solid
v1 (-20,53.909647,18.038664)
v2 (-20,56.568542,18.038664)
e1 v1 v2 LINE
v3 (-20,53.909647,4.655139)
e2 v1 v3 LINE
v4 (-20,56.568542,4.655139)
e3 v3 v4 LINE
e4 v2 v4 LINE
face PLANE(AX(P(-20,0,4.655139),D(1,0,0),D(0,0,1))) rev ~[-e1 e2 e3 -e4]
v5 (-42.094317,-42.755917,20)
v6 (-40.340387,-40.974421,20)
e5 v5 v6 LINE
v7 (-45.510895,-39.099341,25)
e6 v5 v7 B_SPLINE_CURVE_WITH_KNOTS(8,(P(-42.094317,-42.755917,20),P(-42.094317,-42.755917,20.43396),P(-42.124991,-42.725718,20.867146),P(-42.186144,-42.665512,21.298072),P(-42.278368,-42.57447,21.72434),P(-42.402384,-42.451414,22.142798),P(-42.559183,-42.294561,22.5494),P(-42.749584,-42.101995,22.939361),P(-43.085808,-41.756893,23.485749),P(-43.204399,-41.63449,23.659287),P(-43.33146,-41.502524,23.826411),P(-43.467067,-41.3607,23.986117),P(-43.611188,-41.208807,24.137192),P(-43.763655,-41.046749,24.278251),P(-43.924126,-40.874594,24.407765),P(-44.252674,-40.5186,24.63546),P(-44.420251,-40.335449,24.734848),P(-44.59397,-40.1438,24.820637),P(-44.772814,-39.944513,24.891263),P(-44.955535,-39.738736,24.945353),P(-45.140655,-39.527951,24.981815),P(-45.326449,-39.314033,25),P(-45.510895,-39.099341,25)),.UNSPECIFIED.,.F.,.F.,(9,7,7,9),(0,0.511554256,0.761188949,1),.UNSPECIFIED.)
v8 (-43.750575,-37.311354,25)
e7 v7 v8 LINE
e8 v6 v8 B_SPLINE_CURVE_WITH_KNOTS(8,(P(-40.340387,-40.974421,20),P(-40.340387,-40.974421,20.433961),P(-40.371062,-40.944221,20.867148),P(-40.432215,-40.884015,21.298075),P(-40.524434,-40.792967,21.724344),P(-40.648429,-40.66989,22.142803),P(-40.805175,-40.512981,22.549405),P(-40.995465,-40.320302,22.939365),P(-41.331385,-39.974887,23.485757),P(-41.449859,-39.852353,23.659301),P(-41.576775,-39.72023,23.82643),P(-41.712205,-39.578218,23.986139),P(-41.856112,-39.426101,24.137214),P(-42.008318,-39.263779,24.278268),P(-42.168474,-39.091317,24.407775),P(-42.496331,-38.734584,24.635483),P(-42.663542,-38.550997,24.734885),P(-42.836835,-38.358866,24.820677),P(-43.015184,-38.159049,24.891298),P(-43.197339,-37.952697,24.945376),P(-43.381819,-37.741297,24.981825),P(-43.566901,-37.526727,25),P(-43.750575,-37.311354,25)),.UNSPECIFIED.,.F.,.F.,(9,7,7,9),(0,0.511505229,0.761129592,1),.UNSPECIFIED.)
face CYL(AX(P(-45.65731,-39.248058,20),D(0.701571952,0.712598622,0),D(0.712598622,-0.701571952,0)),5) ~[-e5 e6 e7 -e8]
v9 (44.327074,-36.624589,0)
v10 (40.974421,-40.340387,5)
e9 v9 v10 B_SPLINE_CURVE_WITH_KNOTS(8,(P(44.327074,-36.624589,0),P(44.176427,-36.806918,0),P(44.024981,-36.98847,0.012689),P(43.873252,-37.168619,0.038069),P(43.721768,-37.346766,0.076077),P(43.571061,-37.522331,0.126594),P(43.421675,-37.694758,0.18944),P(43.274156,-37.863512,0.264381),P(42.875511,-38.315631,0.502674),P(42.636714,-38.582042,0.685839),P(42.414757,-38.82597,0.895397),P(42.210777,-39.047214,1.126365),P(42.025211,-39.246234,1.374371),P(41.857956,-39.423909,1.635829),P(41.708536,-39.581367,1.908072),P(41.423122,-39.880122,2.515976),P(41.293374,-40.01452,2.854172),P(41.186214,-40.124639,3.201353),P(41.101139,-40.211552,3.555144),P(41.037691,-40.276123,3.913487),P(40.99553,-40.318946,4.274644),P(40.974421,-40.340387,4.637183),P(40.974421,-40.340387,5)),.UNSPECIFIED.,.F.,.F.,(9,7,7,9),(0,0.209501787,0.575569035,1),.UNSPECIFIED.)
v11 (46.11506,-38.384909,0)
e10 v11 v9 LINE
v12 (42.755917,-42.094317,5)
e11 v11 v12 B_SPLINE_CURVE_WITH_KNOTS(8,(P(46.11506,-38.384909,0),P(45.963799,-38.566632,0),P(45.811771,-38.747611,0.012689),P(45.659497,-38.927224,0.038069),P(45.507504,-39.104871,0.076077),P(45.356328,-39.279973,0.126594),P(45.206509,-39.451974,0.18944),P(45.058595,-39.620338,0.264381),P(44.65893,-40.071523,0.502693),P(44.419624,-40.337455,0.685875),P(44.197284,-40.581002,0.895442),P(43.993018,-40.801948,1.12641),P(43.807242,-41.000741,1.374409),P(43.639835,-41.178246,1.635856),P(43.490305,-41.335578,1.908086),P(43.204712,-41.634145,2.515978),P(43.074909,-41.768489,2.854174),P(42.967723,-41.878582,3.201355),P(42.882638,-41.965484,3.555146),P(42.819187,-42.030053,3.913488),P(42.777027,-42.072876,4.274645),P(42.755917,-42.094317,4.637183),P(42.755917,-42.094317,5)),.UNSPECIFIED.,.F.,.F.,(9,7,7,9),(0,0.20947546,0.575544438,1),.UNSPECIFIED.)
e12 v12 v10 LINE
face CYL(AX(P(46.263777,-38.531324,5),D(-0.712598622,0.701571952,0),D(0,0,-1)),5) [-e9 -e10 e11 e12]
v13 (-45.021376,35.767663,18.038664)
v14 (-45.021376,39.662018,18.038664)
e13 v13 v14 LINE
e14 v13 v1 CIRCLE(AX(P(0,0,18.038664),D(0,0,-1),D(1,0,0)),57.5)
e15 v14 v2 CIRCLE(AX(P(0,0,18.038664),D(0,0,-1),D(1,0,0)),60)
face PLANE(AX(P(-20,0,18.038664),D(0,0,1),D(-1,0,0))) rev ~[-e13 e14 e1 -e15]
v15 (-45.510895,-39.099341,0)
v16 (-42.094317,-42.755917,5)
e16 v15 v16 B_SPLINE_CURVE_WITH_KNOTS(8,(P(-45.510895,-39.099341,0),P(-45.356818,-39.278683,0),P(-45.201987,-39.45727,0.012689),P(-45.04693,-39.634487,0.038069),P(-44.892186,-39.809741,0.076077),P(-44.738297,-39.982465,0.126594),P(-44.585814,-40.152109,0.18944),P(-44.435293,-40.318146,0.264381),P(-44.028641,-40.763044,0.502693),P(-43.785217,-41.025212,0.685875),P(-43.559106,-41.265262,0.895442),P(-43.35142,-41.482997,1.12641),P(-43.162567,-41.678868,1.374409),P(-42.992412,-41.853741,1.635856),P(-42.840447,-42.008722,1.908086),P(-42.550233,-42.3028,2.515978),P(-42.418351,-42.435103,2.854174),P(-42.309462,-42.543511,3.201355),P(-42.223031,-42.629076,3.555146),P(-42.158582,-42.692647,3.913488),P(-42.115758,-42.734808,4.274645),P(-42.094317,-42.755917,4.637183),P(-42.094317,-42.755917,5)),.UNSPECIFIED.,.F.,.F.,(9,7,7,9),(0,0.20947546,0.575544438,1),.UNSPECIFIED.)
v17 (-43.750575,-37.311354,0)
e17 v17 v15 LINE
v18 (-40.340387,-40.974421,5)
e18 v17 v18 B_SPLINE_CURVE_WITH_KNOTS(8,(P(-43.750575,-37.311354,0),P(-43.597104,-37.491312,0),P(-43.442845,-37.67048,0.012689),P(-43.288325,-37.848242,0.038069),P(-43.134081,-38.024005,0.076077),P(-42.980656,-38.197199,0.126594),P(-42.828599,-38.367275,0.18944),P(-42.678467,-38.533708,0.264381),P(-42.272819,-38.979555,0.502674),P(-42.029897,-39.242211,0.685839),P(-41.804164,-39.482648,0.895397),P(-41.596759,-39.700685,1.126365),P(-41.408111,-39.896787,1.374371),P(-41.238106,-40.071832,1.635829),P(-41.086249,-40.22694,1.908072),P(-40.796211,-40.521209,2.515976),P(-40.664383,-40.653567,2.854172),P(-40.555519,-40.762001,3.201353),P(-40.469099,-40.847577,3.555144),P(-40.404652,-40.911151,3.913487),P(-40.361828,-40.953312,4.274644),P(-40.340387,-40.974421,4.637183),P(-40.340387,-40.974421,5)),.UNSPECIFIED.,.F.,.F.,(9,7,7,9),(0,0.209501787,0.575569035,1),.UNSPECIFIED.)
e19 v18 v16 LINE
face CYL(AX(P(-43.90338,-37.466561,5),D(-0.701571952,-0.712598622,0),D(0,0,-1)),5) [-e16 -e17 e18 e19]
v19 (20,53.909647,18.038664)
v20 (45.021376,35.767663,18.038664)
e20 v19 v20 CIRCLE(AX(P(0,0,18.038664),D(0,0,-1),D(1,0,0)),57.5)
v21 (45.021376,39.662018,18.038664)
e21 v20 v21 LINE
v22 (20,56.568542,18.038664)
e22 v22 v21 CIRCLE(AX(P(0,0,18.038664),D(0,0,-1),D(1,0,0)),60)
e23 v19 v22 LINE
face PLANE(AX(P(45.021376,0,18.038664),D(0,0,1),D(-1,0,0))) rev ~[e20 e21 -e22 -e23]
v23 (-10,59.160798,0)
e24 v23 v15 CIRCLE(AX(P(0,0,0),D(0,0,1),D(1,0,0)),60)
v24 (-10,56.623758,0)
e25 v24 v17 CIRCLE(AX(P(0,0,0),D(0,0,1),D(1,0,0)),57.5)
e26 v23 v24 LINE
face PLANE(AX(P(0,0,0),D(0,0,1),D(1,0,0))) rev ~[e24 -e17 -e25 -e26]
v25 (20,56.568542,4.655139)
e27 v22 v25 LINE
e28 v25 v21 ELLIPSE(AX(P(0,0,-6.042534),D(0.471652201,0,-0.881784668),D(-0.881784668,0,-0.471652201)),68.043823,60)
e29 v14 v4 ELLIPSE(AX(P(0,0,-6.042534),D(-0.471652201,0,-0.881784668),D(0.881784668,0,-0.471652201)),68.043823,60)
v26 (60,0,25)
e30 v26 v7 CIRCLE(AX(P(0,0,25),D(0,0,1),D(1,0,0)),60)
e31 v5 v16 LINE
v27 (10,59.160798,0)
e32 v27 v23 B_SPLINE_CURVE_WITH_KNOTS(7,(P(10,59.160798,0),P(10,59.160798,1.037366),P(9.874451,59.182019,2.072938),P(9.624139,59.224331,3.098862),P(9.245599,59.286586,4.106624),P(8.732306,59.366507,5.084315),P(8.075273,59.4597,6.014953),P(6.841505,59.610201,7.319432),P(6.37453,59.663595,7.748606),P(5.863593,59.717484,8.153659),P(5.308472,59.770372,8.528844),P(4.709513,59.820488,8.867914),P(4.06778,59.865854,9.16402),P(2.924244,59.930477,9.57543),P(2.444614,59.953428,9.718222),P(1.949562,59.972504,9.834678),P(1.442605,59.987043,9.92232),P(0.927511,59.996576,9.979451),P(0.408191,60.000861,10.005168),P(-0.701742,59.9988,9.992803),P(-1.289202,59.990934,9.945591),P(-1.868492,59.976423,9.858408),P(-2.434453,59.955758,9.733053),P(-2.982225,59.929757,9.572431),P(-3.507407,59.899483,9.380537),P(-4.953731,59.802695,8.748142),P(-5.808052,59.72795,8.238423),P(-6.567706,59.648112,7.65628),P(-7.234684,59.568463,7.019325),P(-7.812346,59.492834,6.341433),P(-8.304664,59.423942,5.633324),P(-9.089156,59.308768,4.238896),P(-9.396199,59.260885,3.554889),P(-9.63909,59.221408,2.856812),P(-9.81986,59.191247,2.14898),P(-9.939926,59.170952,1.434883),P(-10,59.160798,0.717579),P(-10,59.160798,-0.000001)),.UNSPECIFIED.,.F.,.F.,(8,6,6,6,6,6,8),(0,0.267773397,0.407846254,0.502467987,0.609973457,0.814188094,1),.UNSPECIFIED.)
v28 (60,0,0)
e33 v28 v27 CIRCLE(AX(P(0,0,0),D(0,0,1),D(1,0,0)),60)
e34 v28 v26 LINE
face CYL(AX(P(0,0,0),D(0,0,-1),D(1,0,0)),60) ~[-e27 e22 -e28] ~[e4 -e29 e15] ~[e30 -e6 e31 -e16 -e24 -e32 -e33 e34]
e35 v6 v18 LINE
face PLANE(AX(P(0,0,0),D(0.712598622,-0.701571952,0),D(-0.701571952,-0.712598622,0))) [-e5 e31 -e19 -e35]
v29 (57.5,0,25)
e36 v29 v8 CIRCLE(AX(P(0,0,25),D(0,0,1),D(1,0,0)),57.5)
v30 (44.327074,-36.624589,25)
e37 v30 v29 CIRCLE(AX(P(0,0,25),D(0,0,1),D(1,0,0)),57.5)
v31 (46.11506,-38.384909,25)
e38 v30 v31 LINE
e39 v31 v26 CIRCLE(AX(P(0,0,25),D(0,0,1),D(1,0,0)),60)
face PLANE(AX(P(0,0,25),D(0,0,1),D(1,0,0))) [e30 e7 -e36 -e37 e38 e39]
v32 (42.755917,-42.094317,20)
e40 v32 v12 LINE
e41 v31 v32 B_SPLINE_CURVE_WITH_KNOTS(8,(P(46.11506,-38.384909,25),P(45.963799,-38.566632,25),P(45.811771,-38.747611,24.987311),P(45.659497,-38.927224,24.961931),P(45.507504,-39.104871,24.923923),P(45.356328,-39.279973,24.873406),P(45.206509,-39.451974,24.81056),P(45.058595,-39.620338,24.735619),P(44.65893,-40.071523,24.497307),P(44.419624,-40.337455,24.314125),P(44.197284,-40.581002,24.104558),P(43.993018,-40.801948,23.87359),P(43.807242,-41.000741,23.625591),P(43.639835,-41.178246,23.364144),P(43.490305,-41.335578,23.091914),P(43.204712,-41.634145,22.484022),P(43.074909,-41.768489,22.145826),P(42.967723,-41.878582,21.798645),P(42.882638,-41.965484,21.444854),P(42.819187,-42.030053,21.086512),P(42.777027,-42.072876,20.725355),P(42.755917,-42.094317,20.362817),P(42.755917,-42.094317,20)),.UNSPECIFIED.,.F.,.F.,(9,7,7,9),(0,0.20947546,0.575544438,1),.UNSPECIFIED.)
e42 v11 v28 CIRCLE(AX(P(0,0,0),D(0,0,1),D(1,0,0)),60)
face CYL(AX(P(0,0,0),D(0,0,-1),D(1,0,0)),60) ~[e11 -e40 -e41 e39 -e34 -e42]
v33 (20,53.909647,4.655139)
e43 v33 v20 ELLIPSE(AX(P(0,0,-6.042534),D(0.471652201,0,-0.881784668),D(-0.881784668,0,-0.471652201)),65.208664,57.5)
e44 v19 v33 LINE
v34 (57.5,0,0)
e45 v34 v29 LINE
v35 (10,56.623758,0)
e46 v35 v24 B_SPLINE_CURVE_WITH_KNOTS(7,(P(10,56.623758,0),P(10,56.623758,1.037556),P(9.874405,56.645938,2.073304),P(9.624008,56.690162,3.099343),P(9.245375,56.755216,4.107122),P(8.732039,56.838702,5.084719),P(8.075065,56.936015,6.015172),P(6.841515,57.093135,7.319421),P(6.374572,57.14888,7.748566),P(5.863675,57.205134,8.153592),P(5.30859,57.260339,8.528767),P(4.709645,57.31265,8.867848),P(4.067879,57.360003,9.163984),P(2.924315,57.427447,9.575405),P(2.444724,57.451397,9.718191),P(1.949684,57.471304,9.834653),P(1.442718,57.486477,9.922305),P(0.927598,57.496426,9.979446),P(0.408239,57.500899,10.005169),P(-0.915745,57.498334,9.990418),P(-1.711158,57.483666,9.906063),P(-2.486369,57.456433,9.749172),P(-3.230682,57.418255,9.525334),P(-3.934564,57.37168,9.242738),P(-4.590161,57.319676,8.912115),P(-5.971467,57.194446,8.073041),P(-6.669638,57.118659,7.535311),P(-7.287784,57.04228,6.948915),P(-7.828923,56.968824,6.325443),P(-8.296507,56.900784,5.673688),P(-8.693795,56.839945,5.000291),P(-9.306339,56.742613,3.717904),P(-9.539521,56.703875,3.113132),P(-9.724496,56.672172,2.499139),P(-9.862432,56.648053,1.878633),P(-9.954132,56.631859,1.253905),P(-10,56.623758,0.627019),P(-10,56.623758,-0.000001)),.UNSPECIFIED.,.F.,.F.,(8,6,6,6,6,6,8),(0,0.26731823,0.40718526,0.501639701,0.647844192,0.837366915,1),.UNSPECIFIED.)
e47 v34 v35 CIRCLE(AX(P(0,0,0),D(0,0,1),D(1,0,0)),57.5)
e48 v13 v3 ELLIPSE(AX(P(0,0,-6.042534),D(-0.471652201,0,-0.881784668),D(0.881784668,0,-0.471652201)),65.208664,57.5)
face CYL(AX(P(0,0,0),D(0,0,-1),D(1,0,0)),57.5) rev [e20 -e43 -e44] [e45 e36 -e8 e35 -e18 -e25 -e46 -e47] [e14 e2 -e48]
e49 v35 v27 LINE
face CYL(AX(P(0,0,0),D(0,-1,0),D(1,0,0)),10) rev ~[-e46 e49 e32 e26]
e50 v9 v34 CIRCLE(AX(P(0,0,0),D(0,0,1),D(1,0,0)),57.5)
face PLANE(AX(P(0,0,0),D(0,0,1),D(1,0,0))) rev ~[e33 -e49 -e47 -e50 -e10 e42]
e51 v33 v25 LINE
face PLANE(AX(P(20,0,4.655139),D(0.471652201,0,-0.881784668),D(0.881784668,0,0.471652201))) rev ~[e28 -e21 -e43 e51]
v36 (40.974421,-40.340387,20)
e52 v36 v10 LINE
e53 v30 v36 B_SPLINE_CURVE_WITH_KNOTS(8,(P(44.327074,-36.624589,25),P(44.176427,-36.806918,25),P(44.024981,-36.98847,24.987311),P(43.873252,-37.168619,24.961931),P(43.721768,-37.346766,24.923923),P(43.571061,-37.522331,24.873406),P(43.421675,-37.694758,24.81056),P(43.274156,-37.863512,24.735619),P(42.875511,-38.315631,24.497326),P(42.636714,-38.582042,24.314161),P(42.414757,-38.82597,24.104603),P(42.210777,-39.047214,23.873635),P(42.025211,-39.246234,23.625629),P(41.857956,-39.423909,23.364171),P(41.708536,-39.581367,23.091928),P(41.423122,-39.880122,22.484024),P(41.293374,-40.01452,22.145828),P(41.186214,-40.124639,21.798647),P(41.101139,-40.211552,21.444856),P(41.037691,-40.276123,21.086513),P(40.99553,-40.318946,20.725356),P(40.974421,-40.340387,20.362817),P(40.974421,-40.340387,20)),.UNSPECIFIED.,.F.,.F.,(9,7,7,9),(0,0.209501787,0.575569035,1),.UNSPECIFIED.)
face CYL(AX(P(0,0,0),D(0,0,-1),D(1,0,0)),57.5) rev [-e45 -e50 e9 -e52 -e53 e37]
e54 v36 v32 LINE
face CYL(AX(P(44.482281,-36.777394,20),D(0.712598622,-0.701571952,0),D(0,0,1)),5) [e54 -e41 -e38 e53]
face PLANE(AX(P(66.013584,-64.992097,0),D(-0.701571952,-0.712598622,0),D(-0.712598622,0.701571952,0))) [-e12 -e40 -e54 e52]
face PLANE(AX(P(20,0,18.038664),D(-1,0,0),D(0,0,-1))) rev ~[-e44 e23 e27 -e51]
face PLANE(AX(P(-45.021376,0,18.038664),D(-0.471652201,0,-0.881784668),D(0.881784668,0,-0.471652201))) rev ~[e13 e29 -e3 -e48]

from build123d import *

# Parameters (mm, degrees)
F0_R     = 60
F0_R_2   = 57.5
F1_DEPTH = 25
F2_R     = 10
F3_DEPTH = 60.001
F5_DEPTH = 60.0010001012
F7_DEPTH = 25.0010001
F8_R     = 5


# Not quite as in the source:
# - a feature names something its author has since deleted; it is built from what else it names


with BuildPart() as f1:
    # F0 (on Top) → F1 (new body)
    with BuildSketch(Plane.XY):
        Circle(F0_R)
        Circle(F0_R_2, mode=Mode.SUBTRACT)
    extrude(amount=F1_DEPTH)

    # F2 (on Front) → F3 (cut, through all)
    with BuildSketch(Plane.XZ):
        Circle(F2_R)
    extrude(amount=-F3_DEPTH, mode=Mode.SUBTRACT)

    # F4 (on Front) → F5 (cut, through all)
    with BuildSketch(Plane.XZ):
        Polygon((-20, 4.6551390551), (-20, 18.0386640131), (-45.0213760883, 18.0386640131), align=None)
        Polygon((45.0213760883, 18.0386640131), (20, 18.0386640131), (20, 4.6551390551), align=None)
    extrude(amount=-F5_DEPTH, mode=Mode.SUBTRACT)

    # F6 (on Top) → F7 (cut, through all)
    with BuildSketch(Plane.XY):
        Polygon((66.0135835631, -64.9920968146), (0, 0), (-63.9864164369, -64.9920968146), align=None)
    extrude(amount=F7_DEPTH, mode=Mode.SUBTRACT)

    # F8
    f8_edges = [f1.edges().sort_by_distance(p)[0] for p in [
        (-41.217352, -41.865169, 25),
        (-41.217352, -41.865169, 0),
        (41.865169, -41.217352, 25),
        (41.865169, -41.217352, 0),
    ]]
    fillet(f8_edges, radius=F8_R)


solid = f1.part
